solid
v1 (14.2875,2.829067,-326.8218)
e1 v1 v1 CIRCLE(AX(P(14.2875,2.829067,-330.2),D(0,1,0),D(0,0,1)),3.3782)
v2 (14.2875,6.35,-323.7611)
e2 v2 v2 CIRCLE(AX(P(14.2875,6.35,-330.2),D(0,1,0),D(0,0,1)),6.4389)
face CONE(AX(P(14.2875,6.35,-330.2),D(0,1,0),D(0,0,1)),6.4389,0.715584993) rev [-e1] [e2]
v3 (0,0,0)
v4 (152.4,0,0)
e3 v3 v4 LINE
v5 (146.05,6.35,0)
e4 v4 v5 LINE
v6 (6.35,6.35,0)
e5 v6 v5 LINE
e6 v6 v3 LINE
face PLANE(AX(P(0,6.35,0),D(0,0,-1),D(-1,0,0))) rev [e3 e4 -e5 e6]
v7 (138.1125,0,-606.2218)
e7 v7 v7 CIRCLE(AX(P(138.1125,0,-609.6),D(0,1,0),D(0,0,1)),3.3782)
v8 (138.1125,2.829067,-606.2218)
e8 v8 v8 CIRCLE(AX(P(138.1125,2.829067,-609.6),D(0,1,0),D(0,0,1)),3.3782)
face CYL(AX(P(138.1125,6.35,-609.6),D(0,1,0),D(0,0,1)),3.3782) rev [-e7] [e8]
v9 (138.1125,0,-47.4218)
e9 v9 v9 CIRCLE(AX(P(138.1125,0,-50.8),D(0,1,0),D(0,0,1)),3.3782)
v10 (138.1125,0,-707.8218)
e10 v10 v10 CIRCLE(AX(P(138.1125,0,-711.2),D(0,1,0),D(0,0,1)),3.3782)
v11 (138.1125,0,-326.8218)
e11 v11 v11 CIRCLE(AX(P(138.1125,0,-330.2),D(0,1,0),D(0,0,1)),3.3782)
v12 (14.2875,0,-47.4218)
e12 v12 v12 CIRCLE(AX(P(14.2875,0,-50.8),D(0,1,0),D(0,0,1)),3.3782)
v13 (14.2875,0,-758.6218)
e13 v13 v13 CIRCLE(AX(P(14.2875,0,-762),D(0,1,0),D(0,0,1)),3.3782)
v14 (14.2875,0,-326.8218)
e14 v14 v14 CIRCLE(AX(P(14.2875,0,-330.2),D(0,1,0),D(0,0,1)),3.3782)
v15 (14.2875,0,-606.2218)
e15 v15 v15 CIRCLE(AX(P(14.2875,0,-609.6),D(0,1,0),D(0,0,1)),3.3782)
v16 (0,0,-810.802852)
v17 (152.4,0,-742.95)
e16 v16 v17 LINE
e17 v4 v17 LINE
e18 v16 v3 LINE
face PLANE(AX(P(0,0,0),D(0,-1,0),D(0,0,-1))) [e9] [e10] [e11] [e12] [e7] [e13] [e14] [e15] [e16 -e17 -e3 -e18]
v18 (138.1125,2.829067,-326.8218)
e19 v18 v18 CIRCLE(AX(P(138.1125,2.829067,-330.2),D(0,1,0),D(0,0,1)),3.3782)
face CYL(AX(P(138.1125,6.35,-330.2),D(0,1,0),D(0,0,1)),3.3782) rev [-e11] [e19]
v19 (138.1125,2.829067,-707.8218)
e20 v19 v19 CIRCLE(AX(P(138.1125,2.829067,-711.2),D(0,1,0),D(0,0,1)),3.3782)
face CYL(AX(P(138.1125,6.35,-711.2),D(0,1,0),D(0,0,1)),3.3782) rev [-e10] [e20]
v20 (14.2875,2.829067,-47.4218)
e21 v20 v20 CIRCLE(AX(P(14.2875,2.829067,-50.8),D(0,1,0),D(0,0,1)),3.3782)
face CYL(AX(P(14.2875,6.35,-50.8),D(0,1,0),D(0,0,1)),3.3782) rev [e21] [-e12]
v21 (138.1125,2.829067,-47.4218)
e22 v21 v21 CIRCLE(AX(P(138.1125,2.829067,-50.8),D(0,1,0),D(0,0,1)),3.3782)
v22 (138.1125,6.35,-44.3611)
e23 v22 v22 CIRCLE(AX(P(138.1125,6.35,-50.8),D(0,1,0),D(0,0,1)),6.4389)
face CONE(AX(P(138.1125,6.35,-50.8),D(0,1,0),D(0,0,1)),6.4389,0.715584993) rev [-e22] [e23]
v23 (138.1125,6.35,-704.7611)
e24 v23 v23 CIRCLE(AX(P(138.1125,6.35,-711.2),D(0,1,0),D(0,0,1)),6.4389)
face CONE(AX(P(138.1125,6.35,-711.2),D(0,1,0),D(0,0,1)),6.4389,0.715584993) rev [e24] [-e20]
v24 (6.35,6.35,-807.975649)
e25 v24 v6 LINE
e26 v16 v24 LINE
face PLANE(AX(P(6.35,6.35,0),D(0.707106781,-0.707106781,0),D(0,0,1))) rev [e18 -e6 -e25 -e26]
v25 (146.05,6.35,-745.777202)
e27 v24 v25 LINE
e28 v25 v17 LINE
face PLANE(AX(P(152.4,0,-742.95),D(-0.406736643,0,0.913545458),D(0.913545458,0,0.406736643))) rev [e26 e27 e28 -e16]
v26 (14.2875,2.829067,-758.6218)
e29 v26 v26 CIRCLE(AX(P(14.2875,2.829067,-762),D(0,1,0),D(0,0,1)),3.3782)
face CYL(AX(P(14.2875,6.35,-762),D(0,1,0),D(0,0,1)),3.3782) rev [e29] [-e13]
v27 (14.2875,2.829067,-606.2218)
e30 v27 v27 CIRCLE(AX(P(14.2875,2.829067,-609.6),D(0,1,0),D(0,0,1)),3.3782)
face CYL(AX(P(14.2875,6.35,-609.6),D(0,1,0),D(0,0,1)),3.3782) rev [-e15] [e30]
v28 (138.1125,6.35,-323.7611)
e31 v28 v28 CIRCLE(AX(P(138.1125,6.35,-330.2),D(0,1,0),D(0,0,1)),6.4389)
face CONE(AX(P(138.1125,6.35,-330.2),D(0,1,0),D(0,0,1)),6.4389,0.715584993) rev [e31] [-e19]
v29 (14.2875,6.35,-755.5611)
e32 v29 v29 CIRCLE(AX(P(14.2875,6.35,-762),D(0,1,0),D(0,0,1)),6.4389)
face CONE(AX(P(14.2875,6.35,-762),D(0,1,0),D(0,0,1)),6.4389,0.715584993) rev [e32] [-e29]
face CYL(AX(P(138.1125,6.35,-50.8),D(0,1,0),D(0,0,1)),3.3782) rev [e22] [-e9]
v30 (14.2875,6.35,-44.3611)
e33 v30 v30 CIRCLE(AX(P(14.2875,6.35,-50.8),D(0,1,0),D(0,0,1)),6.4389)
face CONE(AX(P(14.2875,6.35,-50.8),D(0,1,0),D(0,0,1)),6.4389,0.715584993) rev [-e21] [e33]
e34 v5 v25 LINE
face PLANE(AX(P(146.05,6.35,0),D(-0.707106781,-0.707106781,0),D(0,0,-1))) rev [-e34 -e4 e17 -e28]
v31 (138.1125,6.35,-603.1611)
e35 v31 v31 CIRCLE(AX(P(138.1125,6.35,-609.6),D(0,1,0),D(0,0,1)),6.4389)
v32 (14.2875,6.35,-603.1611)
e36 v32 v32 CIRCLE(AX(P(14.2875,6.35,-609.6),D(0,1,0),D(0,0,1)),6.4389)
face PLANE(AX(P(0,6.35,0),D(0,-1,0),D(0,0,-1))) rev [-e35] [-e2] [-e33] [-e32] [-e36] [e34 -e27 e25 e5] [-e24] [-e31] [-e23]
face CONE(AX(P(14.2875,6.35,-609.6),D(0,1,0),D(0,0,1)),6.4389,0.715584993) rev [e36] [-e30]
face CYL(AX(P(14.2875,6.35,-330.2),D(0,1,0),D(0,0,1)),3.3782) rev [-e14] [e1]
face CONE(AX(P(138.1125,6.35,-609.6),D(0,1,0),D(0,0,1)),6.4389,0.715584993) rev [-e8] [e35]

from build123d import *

# Parameters (mm, degrees)
SKETCH1_W                                     = 152.4
SKETCH1_H                                     = 1219.2
BOSS_EXTRUDE1_DEPTH                           = 6.35
CSK_FOR_1_4_FLAT_HEAD_MACHINE_SCREW1_AT_COUNT = 2
CSK_FOR_1_4_FLAT_HEAD_MACHINE_SCREW1_AT_PITCH = 123.825
CSK_FOR_1_4_FLAT_HEAD_MACHINE_SCREW1_2_COUNT  = 2
CSK_FOR_1_4_FLAT_HEAD_MACHINE_SCREW1_2_PITCH  = 305.609212271
CSK_FOR_1_4_FLAT_HEAD_MACHINE_SCREW1_3_COUNT  = 2
CSK_FOR_1_4_FLAT_HEAD_MACHINE_SCREW1_3_PITCH  = 572.354846773
CSK_FOR_1_4_FLAT_HEAD_MACHINE_SCREW1_4_COUNT  = 2
CSK_FOR_1_4_FLAT_HEAD_MACHINE_SCREW1_4_PITCH  = 847.296801968
CSK_FOR_1_4_FLAT_HEAD_MACHINE_SCREW1_5_COUNT  = 2
CSK_FOR_1_4_FLAT_HEAD_MACHINE_SCREW1_5_PITCH  = 1124.438700252
CSK_FOR_1_4_FLAT_HEAD_MACHINE_SCREW1_6_COUNT  = 2
CSK_FOR_1_4_FLAT_HEAD_MACHINE_SCREW1_6_PITCH  = 279.4
CSK_FOR_1_4_FLAT_HEAD_MACHINE_SCREW1_7_COUNT  = 2
CSK_FOR_1_4_FLAT_HEAD_MACHINE_SCREW1_7_PITCH  = 558.8
CSK_FOR_1_4_FLAT_HEAD_MACHINE_SCREW1_8_COUNT  = 2
CSK_FOR_1_4_FLAT_HEAD_MACHINE_SCREW1_8_PITCH  = 838.2
CSK_FOR_1_4_FLAT_HEAD_MACHINE_SCREW1_9_COUNT  = 2
CSK_FOR_1_4_FLAT_HEAD_MACHINE_SCREW1_9_PITCH  = 1117.6
CHAMFER1_SIZE                                 = 6.35
CUT_EXTRUDE1_DEPTH                            = 1229.704489493
CSK_FOR_1_4_FLAT_HEAD_MACHINE_SCREW2_AT_COUNT = 2
CSK_FOR_1_4_FLAT_HEAD_MACHINE_SCREW2_AT_PITCH = 133.840467068


with BuildPart() as part:
    # Sketch1 → Boss-Extrude1 (new body)
    with BuildSketch(Plane(origin=(0, 0, 0), x_dir=(1, 0, 0), z_dir=(0, 1, 0))):
        with Locations((76.2, 609.6)):
            Rectangle(SKETCH1_W, SKETCH1_H)
    extrude(amount=BOSS_EXTRUDE1_DEPTH)

    # Sketch3 → CSK for 1/4 Flat Head Machine Screw1 (revolve, cut)
    with BuildSketch(Plane(origin=(14.2875, 6.35, -1168.4), x_dir=(0, 0, 1), z_dir=(1, 0, 0))):
        Polygon((0, 0), (0, 6.35), (3.3782, 6.35), (3.3782, 3.520932584), (6.4389, 0), align=None)
    csk_for_1_4_flat_head_machine_screw1 = revolve(axis=Axis((14.2875, 12.7, -1168.4), (0, -1, 0)), mode=Mode.SUBTRACT)

    # CSK for 1/4 Flat Head Machine Screw1 at: CSK for 1/4 Flat Head Machine Screw1 ×2
    with Locations(*[(i * CSK_FOR_1_4_FLAT_HEAD_MACHINE_SCREW1_AT_PITCH, 0, 0) for i in range(1, CSK_FOR_1_4_FLAT_HEAD_MACHINE_SCREW1_AT_COUNT)]):
        add(csk_for_1_4_flat_head_machine_screw1, mode=Mode.SUBTRACT)

    # CSK for 1_4 Flat Head Machine Screw1 2: CSK for 1/4 Flat Head Machine Screw1 ×2
    with Locations(*[Vector(0.405174304399354, 0, 0.9142394560805718) * (i * CSK_FOR_1_4_FLAT_HEAD_MACHINE_SCREW1_2_PITCH) for i in range(1, CSK_FOR_1_4_FLAT_HEAD_MACHINE_SCREW1_2_COUNT)]):
        add(csk_for_1_4_flat_head_machine_screw1, mode=Mode.SUBTRACT)

    # CSK for 1_4 Flat Head Machine Screw1 3: CSK for 1/4 Flat Head Machine Screw1 ×2
    with Locations(*[Vector(0.21634306182267615, 0, 0.9763174071997232) * (i * CSK_FOR_1_4_FLAT_HEAD_MACHINE_SCREW1_3_PITCH) for i in range(1, CSK_FOR_1_4_FLAT_HEAD_MACHINE_SCREW1_3_COUNT)]):
        add(csk_for_1_4_flat_head_machine_screw1, mode=Mode.SUBTRACT)

    # CSK for 1_4 Flat Head Machine Screw1 4: CSK for 1/4 Flat Head Machine Screw1 ×2
    with Locations(*[Vector(0.1461412337594335, 0, 0.9892637362176331) * (i * CSK_FOR_1_4_FLAT_HEAD_MACHINE_SCREW1_4_PITCH) for i in range(1, CSK_FOR_1_4_FLAT_HEAD_MACHINE_SCREW1_4_COUNT)]):
        add(csk_for_1_4_flat_head_machine_screw1, mode=Mode.SUBTRACT)

    # CSK for 1_4 Flat Head Machine Screw1 5: CSK for 1/4 Flat Head Machine Screw1 ×2
    with Locations(*[Vector(0.11012160998392527, 0, 0.9939181208804618) * (i * CSK_FOR_1_4_FLAT_HEAD_MACHINE_SCREW1_5_PITCH) for i in range(1, CSK_FOR_1_4_FLAT_HEAD_MACHINE_SCREW1_5_COUNT)]):
        add(csk_for_1_4_flat_head_machine_screw1, mode=Mode.SUBTRACT)

    # CSK for 1_4 Flat Head Machine Screw1 6: CSK for 1/4 Flat Head Machine Screw1 ×2
    with Locations(*[(0, 0, i * CSK_FOR_1_4_FLAT_HEAD_MACHINE_SCREW1_6_PITCH) for i in range(1, CSK_FOR_1_4_FLAT_HEAD_MACHINE_SCREW1_6_COUNT)]):
        add(csk_for_1_4_flat_head_machine_screw1, mode=Mode.SUBTRACT)

    # CSK for 1_4 Flat Head Machine Screw1 7: CSK for 1/4 Flat Head Machine Screw1 ×2
    with Locations(*[(0, 0, i * CSK_FOR_1_4_FLAT_HEAD_MACHINE_SCREW1_7_PITCH) for i in range(1, CSK_FOR_1_4_FLAT_HEAD_MACHINE_SCREW1_7_COUNT)]):
        add(csk_for_1_4_flat_head_machine_screw1, mode=Mode.SUBTRACT)

    # CSK for 1_4 Flat Head Machine Screw1 8: CSK for 1/4 Flat Head Machine Screw1 ×2
    with Locations(*[(0, 0, i * CSK_FOR_1_4_FLAT_HEAD_MACHINE_SCREW1_8_PITCH) for i in range(1, CSK_FOR_1_4_FLAT_HEAD_MACHINE_SCREW1_8_COUNT)]):
        add(csk_for_1_4_flat_head_machine_screw1, mode=Mode.SUBTRACT)

    # CSK for 1_4 Flat Head Machine Screw1 9: CSK for 1/4 Flat Head Machine Screw1 ×2
    with Locations(*[(0, 0, i * CSK_FOR_1_4_FLAT_HEAD_MACHINE_SCREW1_9_PITCH) for i in range(1, CSK_FOR_1_4_FLAT_HEAD_MACHINE_SCREW1_9_COUNT)]):
        add(csk_for_1_4_flat_head_machine_screw1, mode=Mode.SUBTRACT)

    # Chamfer1
    chamfer1_edges = [part.edges().sort_by_distance(p)[0] for p in [
        (0, 6.35, -609.6),
        (152.4, 6.35, -609.6),
    ]]
    chamfer(chamfer1_edges, length=CHAMFER1_SIZE - 0.0001)  # a hair under: the kernel refuses the full size

    # Sketch4 → Cut-Extrude1 (cut, through all)
    with BuildSketch(Plane(origin=(0, 6.35, 0), x_dir=(1, 0, 0), z_dir=(0, 1, 0))):
        Polygon((152.4, 742.95), (0, 810.802851641), (0, 1219.2), (152.4, 1219.2), align=None)
    extrude(amount=-CUT_EXTRUDE1_DEPTH, mode=Mode.SUBTRACT)

    # Sketch6 → CSK for 1/4 Flat Head Machine Screw2 (revolve, cut)
    with BuildSketch(Plane(origin=(14.2875, 6.35, -762), x_dir=(0, 0, 1), z_dir=(1, 0, 0))):
        Polygon((0, 0), (0, 6.35), (3.3782, 6.35), (3.3782, 3.520932584), (6.4389, 0), align=None)
    csk_for_1_4_flat_head_machine_screw2 = revolve(axis=Axis((14.2875, 12.7, -762), (0, -1, 0)), mode=Mode.SUBTRACT)

    # CSK for 1/4 Flat Head Machine Screw2 at: CSK for 1/4 Flat Head Machine Screw2 ×2
    with Locations(*[Vector(0.9251686183747461, 0, 0.3795563562563057) * (i * CSK_FOR_1_4_FLAT_HEAD_MACHINE_SCREW2_AT_PITCH) for i in range(1, CSK_FOR_1_4_FLAT_HEAD_MACHINE_SCREW2_AT_COUNT)]):
        add(csk_for_1_4_flat_head_machine_screw2, mode=Mode.SUBTRACT)


solid = part.part
